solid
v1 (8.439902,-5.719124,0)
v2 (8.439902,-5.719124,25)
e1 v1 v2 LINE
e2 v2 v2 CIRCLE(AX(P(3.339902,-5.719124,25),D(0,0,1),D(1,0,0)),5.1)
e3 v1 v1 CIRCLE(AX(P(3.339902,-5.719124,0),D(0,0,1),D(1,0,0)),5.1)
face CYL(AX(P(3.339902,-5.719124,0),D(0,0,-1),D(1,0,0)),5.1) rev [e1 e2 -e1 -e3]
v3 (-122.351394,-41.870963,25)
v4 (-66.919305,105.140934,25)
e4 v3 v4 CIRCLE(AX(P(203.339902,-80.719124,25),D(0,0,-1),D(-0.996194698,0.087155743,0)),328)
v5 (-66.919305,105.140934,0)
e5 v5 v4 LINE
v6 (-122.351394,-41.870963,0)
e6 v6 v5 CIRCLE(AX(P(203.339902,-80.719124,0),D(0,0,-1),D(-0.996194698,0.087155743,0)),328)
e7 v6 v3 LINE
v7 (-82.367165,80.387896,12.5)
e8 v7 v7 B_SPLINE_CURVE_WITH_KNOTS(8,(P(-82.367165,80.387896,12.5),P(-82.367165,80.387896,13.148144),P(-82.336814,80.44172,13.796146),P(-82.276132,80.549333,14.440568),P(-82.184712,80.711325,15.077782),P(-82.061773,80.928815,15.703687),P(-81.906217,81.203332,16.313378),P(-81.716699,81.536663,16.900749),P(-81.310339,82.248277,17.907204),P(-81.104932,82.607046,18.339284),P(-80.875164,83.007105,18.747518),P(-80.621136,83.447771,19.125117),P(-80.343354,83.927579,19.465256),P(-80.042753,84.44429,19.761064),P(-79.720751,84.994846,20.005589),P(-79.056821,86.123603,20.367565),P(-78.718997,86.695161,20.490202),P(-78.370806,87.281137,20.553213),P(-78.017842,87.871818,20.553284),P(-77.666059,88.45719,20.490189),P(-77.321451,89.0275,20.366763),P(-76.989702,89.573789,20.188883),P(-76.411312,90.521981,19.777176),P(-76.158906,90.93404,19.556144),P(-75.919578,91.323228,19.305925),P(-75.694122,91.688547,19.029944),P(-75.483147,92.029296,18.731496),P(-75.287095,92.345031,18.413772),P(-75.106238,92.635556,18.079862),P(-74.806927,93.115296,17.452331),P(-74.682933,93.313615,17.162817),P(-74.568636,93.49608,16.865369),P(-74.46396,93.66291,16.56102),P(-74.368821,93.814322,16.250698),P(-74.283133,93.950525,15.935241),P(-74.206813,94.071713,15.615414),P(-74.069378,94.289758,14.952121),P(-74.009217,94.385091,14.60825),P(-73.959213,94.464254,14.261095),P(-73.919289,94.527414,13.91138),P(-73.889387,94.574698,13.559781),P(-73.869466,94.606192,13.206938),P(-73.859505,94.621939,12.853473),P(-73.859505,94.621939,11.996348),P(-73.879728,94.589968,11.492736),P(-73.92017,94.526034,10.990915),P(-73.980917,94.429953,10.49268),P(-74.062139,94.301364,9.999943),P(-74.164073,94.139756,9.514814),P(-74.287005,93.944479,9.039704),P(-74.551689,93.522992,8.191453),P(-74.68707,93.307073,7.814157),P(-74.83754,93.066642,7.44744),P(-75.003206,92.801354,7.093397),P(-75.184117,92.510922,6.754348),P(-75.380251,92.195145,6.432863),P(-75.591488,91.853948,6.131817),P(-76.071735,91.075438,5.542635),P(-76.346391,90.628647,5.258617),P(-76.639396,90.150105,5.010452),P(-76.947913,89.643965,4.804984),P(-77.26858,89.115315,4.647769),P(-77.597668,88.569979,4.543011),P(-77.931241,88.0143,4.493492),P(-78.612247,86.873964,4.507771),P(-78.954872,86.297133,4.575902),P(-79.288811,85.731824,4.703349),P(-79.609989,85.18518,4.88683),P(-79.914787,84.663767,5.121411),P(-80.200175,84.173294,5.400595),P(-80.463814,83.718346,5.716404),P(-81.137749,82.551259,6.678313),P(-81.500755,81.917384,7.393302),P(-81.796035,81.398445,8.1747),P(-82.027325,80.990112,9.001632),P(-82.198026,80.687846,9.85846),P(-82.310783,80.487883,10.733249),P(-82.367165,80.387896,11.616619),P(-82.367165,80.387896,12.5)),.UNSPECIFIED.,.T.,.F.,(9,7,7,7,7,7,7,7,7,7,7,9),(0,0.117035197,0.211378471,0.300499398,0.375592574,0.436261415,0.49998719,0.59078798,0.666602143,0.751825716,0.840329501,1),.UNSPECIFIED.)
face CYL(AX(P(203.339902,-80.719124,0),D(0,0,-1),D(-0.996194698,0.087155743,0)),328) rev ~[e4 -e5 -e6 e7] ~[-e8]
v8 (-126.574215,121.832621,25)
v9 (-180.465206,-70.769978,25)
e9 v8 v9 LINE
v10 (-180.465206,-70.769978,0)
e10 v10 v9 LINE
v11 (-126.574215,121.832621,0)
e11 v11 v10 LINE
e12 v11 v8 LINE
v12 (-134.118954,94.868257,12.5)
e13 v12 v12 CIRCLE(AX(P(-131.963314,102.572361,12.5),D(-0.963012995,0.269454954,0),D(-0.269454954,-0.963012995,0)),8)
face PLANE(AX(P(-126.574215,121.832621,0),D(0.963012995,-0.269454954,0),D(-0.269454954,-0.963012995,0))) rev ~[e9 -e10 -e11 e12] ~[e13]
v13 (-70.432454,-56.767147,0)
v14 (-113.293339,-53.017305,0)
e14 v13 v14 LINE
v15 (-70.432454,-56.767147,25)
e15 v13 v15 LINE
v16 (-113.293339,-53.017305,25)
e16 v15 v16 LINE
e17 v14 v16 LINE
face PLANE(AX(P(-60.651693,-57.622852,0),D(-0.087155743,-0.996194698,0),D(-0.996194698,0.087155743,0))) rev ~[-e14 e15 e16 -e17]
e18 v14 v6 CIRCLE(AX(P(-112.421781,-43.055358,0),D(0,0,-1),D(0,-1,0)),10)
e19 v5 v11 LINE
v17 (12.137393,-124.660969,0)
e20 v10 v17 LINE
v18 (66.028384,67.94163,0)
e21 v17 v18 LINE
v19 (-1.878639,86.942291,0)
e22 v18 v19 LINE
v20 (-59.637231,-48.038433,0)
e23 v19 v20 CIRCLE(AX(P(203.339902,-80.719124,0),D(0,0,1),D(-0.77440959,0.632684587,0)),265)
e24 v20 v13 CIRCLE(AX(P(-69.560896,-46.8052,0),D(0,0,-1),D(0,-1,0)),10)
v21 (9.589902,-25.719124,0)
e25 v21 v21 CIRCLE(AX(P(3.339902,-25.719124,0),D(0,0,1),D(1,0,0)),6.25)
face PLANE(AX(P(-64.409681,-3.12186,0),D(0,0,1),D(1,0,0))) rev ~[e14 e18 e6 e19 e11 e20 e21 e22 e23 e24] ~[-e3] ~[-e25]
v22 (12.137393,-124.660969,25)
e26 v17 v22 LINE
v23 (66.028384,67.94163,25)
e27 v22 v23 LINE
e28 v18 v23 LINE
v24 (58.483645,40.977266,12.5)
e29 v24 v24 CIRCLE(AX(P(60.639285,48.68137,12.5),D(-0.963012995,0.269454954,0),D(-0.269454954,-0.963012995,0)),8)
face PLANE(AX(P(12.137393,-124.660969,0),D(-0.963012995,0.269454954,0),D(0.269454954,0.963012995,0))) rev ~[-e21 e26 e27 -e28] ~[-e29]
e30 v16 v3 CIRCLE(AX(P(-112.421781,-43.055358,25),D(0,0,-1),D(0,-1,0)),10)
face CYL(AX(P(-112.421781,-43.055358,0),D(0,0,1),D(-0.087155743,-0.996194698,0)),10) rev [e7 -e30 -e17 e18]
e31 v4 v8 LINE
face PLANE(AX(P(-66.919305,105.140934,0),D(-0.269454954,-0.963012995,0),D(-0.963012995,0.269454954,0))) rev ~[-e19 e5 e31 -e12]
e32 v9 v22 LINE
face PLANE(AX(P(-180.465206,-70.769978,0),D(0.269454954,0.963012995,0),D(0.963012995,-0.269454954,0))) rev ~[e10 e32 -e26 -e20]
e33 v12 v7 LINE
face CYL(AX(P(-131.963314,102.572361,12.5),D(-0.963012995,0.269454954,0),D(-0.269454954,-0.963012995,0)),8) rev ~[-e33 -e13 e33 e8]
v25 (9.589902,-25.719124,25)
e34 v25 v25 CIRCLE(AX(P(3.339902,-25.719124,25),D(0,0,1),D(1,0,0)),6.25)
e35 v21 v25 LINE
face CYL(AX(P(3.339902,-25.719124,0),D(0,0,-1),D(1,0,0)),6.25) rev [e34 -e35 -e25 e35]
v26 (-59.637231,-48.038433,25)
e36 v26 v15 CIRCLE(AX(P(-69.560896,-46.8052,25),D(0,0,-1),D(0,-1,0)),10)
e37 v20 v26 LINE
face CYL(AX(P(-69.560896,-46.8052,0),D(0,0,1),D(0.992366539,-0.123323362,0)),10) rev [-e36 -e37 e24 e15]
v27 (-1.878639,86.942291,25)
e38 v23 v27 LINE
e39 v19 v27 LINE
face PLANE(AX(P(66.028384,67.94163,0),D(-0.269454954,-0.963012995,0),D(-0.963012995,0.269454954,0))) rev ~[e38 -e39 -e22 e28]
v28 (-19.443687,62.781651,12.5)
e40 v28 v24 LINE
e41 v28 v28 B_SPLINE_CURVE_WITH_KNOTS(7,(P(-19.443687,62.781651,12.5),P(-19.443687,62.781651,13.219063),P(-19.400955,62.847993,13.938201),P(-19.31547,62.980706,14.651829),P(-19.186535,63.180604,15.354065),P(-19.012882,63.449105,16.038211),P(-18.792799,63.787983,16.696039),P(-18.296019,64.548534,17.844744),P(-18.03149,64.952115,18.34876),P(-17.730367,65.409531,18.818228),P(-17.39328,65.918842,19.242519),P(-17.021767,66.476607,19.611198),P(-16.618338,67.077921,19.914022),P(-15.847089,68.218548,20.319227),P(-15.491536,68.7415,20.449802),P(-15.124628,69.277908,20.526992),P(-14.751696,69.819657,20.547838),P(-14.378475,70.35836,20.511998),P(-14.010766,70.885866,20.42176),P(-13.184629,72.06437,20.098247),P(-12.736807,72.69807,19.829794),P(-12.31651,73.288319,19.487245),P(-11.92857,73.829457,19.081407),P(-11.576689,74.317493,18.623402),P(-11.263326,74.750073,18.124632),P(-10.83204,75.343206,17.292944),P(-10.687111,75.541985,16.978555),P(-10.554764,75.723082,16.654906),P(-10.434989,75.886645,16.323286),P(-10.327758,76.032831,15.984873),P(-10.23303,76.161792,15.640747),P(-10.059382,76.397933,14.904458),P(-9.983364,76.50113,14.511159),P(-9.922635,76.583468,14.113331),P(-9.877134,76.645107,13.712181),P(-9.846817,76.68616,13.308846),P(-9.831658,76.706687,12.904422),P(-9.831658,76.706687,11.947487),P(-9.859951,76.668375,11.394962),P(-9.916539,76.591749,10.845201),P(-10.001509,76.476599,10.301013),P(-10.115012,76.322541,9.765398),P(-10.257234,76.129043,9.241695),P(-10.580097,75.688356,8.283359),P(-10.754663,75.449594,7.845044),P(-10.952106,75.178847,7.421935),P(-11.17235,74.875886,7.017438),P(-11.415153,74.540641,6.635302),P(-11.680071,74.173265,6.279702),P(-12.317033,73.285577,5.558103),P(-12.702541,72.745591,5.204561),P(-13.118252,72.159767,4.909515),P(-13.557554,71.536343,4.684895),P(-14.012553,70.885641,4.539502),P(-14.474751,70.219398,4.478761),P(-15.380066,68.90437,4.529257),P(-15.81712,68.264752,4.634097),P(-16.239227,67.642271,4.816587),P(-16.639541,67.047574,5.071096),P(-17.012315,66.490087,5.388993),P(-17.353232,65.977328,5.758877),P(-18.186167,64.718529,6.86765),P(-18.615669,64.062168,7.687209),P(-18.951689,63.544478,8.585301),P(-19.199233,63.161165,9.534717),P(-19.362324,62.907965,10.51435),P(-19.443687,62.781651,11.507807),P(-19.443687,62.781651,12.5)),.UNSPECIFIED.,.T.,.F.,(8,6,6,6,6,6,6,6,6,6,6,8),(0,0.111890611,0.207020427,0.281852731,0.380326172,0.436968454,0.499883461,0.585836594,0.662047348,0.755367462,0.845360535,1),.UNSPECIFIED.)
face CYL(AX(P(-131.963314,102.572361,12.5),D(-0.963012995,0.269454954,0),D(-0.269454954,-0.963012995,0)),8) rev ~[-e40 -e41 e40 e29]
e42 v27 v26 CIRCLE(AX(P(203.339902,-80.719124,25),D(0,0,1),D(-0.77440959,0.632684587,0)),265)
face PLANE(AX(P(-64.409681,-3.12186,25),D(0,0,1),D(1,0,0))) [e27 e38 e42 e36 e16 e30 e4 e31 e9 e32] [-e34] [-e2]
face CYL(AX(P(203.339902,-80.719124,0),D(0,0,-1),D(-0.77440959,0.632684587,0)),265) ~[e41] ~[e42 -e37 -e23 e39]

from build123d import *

# Parameters (mm, degrees)
F0_R     = 6.25
F0_R_2   = 5.1
F1_DEPTH = 25
F2_R     = 10
F3_R     = 8
F4_DEPTH = 200


# Not quite as in the source:
# - a feature names something its author has since deleted; it is built from what else it names


with BuildPart() as f1:
    # F0 (on Top) → F1 (new body)
    with BuildSketch(Plane.XY):
        with BuildLine():
            ThreePointArc((-1.8786394122, 86.9422913227), (-42.1479963116, 19.0841411618), (-60.6516929848, -57.622852377))
            Line((-60.6516929848, -57.622852377), (-123.4119589646, -52.1320405839))
            ThreePointArc((-123.4119589646, -52.1320405839), (-105.3496683323, 30.162565727), (-66.9193045914, 105.1409340308))
            Line((-66.9193045914, 105.1409340308), (-126.574214908, 121.8326206187))
            Line((-126.574214908, 121.8326206187), (-180.4652056167, -70.7699783265))
            Line((-180.4652056167, -70.7699783265), (12.1373933285, -124.6609690352))
            Line((12.1373933285, -124.6609690352), (66.0283840372, 67.9416299099))
            Line((66.0283840372, 67.9416299099), (-1.8786394122, 86.9422913227))
        make_face()
        with Locations((3.3399020095, -25.7191242051)):
            Circle(F0_R, mode=Mode.SUBTRACT)
        with Locations((3.3399020095, -5.7191242051)):
            Circle(F0_R_2, mode=Mode.SUBTRACT)
    extrude(amount=F1_DEPTH)

    # F2
    f2_edges = [f1.edges().sort_by_distance(p)[0] for p in [
        (-123.411959, -52.132041, 12.5),
        (-60.651693, -57.622852, 12.5),
    ]]
    fillet(f2_edges, radius=F2_R)

    # F3 (on face) → F4 (cut, through all)
    with BuildSketch(Plane(origin=(-148.998349815, 41.6903444163, 0), x_dir=(-0.2694549535, -0.9630129947, 0), z_dir=(-0.9630129947, 0.2694549535, 0))):
        with Locations((-63.2203476394, 12.5)):
            Circle(F3_R)
    extrude(amount=-F4_DEPTH, mode=Mode.SUBTRACT)


solid = f1.part
